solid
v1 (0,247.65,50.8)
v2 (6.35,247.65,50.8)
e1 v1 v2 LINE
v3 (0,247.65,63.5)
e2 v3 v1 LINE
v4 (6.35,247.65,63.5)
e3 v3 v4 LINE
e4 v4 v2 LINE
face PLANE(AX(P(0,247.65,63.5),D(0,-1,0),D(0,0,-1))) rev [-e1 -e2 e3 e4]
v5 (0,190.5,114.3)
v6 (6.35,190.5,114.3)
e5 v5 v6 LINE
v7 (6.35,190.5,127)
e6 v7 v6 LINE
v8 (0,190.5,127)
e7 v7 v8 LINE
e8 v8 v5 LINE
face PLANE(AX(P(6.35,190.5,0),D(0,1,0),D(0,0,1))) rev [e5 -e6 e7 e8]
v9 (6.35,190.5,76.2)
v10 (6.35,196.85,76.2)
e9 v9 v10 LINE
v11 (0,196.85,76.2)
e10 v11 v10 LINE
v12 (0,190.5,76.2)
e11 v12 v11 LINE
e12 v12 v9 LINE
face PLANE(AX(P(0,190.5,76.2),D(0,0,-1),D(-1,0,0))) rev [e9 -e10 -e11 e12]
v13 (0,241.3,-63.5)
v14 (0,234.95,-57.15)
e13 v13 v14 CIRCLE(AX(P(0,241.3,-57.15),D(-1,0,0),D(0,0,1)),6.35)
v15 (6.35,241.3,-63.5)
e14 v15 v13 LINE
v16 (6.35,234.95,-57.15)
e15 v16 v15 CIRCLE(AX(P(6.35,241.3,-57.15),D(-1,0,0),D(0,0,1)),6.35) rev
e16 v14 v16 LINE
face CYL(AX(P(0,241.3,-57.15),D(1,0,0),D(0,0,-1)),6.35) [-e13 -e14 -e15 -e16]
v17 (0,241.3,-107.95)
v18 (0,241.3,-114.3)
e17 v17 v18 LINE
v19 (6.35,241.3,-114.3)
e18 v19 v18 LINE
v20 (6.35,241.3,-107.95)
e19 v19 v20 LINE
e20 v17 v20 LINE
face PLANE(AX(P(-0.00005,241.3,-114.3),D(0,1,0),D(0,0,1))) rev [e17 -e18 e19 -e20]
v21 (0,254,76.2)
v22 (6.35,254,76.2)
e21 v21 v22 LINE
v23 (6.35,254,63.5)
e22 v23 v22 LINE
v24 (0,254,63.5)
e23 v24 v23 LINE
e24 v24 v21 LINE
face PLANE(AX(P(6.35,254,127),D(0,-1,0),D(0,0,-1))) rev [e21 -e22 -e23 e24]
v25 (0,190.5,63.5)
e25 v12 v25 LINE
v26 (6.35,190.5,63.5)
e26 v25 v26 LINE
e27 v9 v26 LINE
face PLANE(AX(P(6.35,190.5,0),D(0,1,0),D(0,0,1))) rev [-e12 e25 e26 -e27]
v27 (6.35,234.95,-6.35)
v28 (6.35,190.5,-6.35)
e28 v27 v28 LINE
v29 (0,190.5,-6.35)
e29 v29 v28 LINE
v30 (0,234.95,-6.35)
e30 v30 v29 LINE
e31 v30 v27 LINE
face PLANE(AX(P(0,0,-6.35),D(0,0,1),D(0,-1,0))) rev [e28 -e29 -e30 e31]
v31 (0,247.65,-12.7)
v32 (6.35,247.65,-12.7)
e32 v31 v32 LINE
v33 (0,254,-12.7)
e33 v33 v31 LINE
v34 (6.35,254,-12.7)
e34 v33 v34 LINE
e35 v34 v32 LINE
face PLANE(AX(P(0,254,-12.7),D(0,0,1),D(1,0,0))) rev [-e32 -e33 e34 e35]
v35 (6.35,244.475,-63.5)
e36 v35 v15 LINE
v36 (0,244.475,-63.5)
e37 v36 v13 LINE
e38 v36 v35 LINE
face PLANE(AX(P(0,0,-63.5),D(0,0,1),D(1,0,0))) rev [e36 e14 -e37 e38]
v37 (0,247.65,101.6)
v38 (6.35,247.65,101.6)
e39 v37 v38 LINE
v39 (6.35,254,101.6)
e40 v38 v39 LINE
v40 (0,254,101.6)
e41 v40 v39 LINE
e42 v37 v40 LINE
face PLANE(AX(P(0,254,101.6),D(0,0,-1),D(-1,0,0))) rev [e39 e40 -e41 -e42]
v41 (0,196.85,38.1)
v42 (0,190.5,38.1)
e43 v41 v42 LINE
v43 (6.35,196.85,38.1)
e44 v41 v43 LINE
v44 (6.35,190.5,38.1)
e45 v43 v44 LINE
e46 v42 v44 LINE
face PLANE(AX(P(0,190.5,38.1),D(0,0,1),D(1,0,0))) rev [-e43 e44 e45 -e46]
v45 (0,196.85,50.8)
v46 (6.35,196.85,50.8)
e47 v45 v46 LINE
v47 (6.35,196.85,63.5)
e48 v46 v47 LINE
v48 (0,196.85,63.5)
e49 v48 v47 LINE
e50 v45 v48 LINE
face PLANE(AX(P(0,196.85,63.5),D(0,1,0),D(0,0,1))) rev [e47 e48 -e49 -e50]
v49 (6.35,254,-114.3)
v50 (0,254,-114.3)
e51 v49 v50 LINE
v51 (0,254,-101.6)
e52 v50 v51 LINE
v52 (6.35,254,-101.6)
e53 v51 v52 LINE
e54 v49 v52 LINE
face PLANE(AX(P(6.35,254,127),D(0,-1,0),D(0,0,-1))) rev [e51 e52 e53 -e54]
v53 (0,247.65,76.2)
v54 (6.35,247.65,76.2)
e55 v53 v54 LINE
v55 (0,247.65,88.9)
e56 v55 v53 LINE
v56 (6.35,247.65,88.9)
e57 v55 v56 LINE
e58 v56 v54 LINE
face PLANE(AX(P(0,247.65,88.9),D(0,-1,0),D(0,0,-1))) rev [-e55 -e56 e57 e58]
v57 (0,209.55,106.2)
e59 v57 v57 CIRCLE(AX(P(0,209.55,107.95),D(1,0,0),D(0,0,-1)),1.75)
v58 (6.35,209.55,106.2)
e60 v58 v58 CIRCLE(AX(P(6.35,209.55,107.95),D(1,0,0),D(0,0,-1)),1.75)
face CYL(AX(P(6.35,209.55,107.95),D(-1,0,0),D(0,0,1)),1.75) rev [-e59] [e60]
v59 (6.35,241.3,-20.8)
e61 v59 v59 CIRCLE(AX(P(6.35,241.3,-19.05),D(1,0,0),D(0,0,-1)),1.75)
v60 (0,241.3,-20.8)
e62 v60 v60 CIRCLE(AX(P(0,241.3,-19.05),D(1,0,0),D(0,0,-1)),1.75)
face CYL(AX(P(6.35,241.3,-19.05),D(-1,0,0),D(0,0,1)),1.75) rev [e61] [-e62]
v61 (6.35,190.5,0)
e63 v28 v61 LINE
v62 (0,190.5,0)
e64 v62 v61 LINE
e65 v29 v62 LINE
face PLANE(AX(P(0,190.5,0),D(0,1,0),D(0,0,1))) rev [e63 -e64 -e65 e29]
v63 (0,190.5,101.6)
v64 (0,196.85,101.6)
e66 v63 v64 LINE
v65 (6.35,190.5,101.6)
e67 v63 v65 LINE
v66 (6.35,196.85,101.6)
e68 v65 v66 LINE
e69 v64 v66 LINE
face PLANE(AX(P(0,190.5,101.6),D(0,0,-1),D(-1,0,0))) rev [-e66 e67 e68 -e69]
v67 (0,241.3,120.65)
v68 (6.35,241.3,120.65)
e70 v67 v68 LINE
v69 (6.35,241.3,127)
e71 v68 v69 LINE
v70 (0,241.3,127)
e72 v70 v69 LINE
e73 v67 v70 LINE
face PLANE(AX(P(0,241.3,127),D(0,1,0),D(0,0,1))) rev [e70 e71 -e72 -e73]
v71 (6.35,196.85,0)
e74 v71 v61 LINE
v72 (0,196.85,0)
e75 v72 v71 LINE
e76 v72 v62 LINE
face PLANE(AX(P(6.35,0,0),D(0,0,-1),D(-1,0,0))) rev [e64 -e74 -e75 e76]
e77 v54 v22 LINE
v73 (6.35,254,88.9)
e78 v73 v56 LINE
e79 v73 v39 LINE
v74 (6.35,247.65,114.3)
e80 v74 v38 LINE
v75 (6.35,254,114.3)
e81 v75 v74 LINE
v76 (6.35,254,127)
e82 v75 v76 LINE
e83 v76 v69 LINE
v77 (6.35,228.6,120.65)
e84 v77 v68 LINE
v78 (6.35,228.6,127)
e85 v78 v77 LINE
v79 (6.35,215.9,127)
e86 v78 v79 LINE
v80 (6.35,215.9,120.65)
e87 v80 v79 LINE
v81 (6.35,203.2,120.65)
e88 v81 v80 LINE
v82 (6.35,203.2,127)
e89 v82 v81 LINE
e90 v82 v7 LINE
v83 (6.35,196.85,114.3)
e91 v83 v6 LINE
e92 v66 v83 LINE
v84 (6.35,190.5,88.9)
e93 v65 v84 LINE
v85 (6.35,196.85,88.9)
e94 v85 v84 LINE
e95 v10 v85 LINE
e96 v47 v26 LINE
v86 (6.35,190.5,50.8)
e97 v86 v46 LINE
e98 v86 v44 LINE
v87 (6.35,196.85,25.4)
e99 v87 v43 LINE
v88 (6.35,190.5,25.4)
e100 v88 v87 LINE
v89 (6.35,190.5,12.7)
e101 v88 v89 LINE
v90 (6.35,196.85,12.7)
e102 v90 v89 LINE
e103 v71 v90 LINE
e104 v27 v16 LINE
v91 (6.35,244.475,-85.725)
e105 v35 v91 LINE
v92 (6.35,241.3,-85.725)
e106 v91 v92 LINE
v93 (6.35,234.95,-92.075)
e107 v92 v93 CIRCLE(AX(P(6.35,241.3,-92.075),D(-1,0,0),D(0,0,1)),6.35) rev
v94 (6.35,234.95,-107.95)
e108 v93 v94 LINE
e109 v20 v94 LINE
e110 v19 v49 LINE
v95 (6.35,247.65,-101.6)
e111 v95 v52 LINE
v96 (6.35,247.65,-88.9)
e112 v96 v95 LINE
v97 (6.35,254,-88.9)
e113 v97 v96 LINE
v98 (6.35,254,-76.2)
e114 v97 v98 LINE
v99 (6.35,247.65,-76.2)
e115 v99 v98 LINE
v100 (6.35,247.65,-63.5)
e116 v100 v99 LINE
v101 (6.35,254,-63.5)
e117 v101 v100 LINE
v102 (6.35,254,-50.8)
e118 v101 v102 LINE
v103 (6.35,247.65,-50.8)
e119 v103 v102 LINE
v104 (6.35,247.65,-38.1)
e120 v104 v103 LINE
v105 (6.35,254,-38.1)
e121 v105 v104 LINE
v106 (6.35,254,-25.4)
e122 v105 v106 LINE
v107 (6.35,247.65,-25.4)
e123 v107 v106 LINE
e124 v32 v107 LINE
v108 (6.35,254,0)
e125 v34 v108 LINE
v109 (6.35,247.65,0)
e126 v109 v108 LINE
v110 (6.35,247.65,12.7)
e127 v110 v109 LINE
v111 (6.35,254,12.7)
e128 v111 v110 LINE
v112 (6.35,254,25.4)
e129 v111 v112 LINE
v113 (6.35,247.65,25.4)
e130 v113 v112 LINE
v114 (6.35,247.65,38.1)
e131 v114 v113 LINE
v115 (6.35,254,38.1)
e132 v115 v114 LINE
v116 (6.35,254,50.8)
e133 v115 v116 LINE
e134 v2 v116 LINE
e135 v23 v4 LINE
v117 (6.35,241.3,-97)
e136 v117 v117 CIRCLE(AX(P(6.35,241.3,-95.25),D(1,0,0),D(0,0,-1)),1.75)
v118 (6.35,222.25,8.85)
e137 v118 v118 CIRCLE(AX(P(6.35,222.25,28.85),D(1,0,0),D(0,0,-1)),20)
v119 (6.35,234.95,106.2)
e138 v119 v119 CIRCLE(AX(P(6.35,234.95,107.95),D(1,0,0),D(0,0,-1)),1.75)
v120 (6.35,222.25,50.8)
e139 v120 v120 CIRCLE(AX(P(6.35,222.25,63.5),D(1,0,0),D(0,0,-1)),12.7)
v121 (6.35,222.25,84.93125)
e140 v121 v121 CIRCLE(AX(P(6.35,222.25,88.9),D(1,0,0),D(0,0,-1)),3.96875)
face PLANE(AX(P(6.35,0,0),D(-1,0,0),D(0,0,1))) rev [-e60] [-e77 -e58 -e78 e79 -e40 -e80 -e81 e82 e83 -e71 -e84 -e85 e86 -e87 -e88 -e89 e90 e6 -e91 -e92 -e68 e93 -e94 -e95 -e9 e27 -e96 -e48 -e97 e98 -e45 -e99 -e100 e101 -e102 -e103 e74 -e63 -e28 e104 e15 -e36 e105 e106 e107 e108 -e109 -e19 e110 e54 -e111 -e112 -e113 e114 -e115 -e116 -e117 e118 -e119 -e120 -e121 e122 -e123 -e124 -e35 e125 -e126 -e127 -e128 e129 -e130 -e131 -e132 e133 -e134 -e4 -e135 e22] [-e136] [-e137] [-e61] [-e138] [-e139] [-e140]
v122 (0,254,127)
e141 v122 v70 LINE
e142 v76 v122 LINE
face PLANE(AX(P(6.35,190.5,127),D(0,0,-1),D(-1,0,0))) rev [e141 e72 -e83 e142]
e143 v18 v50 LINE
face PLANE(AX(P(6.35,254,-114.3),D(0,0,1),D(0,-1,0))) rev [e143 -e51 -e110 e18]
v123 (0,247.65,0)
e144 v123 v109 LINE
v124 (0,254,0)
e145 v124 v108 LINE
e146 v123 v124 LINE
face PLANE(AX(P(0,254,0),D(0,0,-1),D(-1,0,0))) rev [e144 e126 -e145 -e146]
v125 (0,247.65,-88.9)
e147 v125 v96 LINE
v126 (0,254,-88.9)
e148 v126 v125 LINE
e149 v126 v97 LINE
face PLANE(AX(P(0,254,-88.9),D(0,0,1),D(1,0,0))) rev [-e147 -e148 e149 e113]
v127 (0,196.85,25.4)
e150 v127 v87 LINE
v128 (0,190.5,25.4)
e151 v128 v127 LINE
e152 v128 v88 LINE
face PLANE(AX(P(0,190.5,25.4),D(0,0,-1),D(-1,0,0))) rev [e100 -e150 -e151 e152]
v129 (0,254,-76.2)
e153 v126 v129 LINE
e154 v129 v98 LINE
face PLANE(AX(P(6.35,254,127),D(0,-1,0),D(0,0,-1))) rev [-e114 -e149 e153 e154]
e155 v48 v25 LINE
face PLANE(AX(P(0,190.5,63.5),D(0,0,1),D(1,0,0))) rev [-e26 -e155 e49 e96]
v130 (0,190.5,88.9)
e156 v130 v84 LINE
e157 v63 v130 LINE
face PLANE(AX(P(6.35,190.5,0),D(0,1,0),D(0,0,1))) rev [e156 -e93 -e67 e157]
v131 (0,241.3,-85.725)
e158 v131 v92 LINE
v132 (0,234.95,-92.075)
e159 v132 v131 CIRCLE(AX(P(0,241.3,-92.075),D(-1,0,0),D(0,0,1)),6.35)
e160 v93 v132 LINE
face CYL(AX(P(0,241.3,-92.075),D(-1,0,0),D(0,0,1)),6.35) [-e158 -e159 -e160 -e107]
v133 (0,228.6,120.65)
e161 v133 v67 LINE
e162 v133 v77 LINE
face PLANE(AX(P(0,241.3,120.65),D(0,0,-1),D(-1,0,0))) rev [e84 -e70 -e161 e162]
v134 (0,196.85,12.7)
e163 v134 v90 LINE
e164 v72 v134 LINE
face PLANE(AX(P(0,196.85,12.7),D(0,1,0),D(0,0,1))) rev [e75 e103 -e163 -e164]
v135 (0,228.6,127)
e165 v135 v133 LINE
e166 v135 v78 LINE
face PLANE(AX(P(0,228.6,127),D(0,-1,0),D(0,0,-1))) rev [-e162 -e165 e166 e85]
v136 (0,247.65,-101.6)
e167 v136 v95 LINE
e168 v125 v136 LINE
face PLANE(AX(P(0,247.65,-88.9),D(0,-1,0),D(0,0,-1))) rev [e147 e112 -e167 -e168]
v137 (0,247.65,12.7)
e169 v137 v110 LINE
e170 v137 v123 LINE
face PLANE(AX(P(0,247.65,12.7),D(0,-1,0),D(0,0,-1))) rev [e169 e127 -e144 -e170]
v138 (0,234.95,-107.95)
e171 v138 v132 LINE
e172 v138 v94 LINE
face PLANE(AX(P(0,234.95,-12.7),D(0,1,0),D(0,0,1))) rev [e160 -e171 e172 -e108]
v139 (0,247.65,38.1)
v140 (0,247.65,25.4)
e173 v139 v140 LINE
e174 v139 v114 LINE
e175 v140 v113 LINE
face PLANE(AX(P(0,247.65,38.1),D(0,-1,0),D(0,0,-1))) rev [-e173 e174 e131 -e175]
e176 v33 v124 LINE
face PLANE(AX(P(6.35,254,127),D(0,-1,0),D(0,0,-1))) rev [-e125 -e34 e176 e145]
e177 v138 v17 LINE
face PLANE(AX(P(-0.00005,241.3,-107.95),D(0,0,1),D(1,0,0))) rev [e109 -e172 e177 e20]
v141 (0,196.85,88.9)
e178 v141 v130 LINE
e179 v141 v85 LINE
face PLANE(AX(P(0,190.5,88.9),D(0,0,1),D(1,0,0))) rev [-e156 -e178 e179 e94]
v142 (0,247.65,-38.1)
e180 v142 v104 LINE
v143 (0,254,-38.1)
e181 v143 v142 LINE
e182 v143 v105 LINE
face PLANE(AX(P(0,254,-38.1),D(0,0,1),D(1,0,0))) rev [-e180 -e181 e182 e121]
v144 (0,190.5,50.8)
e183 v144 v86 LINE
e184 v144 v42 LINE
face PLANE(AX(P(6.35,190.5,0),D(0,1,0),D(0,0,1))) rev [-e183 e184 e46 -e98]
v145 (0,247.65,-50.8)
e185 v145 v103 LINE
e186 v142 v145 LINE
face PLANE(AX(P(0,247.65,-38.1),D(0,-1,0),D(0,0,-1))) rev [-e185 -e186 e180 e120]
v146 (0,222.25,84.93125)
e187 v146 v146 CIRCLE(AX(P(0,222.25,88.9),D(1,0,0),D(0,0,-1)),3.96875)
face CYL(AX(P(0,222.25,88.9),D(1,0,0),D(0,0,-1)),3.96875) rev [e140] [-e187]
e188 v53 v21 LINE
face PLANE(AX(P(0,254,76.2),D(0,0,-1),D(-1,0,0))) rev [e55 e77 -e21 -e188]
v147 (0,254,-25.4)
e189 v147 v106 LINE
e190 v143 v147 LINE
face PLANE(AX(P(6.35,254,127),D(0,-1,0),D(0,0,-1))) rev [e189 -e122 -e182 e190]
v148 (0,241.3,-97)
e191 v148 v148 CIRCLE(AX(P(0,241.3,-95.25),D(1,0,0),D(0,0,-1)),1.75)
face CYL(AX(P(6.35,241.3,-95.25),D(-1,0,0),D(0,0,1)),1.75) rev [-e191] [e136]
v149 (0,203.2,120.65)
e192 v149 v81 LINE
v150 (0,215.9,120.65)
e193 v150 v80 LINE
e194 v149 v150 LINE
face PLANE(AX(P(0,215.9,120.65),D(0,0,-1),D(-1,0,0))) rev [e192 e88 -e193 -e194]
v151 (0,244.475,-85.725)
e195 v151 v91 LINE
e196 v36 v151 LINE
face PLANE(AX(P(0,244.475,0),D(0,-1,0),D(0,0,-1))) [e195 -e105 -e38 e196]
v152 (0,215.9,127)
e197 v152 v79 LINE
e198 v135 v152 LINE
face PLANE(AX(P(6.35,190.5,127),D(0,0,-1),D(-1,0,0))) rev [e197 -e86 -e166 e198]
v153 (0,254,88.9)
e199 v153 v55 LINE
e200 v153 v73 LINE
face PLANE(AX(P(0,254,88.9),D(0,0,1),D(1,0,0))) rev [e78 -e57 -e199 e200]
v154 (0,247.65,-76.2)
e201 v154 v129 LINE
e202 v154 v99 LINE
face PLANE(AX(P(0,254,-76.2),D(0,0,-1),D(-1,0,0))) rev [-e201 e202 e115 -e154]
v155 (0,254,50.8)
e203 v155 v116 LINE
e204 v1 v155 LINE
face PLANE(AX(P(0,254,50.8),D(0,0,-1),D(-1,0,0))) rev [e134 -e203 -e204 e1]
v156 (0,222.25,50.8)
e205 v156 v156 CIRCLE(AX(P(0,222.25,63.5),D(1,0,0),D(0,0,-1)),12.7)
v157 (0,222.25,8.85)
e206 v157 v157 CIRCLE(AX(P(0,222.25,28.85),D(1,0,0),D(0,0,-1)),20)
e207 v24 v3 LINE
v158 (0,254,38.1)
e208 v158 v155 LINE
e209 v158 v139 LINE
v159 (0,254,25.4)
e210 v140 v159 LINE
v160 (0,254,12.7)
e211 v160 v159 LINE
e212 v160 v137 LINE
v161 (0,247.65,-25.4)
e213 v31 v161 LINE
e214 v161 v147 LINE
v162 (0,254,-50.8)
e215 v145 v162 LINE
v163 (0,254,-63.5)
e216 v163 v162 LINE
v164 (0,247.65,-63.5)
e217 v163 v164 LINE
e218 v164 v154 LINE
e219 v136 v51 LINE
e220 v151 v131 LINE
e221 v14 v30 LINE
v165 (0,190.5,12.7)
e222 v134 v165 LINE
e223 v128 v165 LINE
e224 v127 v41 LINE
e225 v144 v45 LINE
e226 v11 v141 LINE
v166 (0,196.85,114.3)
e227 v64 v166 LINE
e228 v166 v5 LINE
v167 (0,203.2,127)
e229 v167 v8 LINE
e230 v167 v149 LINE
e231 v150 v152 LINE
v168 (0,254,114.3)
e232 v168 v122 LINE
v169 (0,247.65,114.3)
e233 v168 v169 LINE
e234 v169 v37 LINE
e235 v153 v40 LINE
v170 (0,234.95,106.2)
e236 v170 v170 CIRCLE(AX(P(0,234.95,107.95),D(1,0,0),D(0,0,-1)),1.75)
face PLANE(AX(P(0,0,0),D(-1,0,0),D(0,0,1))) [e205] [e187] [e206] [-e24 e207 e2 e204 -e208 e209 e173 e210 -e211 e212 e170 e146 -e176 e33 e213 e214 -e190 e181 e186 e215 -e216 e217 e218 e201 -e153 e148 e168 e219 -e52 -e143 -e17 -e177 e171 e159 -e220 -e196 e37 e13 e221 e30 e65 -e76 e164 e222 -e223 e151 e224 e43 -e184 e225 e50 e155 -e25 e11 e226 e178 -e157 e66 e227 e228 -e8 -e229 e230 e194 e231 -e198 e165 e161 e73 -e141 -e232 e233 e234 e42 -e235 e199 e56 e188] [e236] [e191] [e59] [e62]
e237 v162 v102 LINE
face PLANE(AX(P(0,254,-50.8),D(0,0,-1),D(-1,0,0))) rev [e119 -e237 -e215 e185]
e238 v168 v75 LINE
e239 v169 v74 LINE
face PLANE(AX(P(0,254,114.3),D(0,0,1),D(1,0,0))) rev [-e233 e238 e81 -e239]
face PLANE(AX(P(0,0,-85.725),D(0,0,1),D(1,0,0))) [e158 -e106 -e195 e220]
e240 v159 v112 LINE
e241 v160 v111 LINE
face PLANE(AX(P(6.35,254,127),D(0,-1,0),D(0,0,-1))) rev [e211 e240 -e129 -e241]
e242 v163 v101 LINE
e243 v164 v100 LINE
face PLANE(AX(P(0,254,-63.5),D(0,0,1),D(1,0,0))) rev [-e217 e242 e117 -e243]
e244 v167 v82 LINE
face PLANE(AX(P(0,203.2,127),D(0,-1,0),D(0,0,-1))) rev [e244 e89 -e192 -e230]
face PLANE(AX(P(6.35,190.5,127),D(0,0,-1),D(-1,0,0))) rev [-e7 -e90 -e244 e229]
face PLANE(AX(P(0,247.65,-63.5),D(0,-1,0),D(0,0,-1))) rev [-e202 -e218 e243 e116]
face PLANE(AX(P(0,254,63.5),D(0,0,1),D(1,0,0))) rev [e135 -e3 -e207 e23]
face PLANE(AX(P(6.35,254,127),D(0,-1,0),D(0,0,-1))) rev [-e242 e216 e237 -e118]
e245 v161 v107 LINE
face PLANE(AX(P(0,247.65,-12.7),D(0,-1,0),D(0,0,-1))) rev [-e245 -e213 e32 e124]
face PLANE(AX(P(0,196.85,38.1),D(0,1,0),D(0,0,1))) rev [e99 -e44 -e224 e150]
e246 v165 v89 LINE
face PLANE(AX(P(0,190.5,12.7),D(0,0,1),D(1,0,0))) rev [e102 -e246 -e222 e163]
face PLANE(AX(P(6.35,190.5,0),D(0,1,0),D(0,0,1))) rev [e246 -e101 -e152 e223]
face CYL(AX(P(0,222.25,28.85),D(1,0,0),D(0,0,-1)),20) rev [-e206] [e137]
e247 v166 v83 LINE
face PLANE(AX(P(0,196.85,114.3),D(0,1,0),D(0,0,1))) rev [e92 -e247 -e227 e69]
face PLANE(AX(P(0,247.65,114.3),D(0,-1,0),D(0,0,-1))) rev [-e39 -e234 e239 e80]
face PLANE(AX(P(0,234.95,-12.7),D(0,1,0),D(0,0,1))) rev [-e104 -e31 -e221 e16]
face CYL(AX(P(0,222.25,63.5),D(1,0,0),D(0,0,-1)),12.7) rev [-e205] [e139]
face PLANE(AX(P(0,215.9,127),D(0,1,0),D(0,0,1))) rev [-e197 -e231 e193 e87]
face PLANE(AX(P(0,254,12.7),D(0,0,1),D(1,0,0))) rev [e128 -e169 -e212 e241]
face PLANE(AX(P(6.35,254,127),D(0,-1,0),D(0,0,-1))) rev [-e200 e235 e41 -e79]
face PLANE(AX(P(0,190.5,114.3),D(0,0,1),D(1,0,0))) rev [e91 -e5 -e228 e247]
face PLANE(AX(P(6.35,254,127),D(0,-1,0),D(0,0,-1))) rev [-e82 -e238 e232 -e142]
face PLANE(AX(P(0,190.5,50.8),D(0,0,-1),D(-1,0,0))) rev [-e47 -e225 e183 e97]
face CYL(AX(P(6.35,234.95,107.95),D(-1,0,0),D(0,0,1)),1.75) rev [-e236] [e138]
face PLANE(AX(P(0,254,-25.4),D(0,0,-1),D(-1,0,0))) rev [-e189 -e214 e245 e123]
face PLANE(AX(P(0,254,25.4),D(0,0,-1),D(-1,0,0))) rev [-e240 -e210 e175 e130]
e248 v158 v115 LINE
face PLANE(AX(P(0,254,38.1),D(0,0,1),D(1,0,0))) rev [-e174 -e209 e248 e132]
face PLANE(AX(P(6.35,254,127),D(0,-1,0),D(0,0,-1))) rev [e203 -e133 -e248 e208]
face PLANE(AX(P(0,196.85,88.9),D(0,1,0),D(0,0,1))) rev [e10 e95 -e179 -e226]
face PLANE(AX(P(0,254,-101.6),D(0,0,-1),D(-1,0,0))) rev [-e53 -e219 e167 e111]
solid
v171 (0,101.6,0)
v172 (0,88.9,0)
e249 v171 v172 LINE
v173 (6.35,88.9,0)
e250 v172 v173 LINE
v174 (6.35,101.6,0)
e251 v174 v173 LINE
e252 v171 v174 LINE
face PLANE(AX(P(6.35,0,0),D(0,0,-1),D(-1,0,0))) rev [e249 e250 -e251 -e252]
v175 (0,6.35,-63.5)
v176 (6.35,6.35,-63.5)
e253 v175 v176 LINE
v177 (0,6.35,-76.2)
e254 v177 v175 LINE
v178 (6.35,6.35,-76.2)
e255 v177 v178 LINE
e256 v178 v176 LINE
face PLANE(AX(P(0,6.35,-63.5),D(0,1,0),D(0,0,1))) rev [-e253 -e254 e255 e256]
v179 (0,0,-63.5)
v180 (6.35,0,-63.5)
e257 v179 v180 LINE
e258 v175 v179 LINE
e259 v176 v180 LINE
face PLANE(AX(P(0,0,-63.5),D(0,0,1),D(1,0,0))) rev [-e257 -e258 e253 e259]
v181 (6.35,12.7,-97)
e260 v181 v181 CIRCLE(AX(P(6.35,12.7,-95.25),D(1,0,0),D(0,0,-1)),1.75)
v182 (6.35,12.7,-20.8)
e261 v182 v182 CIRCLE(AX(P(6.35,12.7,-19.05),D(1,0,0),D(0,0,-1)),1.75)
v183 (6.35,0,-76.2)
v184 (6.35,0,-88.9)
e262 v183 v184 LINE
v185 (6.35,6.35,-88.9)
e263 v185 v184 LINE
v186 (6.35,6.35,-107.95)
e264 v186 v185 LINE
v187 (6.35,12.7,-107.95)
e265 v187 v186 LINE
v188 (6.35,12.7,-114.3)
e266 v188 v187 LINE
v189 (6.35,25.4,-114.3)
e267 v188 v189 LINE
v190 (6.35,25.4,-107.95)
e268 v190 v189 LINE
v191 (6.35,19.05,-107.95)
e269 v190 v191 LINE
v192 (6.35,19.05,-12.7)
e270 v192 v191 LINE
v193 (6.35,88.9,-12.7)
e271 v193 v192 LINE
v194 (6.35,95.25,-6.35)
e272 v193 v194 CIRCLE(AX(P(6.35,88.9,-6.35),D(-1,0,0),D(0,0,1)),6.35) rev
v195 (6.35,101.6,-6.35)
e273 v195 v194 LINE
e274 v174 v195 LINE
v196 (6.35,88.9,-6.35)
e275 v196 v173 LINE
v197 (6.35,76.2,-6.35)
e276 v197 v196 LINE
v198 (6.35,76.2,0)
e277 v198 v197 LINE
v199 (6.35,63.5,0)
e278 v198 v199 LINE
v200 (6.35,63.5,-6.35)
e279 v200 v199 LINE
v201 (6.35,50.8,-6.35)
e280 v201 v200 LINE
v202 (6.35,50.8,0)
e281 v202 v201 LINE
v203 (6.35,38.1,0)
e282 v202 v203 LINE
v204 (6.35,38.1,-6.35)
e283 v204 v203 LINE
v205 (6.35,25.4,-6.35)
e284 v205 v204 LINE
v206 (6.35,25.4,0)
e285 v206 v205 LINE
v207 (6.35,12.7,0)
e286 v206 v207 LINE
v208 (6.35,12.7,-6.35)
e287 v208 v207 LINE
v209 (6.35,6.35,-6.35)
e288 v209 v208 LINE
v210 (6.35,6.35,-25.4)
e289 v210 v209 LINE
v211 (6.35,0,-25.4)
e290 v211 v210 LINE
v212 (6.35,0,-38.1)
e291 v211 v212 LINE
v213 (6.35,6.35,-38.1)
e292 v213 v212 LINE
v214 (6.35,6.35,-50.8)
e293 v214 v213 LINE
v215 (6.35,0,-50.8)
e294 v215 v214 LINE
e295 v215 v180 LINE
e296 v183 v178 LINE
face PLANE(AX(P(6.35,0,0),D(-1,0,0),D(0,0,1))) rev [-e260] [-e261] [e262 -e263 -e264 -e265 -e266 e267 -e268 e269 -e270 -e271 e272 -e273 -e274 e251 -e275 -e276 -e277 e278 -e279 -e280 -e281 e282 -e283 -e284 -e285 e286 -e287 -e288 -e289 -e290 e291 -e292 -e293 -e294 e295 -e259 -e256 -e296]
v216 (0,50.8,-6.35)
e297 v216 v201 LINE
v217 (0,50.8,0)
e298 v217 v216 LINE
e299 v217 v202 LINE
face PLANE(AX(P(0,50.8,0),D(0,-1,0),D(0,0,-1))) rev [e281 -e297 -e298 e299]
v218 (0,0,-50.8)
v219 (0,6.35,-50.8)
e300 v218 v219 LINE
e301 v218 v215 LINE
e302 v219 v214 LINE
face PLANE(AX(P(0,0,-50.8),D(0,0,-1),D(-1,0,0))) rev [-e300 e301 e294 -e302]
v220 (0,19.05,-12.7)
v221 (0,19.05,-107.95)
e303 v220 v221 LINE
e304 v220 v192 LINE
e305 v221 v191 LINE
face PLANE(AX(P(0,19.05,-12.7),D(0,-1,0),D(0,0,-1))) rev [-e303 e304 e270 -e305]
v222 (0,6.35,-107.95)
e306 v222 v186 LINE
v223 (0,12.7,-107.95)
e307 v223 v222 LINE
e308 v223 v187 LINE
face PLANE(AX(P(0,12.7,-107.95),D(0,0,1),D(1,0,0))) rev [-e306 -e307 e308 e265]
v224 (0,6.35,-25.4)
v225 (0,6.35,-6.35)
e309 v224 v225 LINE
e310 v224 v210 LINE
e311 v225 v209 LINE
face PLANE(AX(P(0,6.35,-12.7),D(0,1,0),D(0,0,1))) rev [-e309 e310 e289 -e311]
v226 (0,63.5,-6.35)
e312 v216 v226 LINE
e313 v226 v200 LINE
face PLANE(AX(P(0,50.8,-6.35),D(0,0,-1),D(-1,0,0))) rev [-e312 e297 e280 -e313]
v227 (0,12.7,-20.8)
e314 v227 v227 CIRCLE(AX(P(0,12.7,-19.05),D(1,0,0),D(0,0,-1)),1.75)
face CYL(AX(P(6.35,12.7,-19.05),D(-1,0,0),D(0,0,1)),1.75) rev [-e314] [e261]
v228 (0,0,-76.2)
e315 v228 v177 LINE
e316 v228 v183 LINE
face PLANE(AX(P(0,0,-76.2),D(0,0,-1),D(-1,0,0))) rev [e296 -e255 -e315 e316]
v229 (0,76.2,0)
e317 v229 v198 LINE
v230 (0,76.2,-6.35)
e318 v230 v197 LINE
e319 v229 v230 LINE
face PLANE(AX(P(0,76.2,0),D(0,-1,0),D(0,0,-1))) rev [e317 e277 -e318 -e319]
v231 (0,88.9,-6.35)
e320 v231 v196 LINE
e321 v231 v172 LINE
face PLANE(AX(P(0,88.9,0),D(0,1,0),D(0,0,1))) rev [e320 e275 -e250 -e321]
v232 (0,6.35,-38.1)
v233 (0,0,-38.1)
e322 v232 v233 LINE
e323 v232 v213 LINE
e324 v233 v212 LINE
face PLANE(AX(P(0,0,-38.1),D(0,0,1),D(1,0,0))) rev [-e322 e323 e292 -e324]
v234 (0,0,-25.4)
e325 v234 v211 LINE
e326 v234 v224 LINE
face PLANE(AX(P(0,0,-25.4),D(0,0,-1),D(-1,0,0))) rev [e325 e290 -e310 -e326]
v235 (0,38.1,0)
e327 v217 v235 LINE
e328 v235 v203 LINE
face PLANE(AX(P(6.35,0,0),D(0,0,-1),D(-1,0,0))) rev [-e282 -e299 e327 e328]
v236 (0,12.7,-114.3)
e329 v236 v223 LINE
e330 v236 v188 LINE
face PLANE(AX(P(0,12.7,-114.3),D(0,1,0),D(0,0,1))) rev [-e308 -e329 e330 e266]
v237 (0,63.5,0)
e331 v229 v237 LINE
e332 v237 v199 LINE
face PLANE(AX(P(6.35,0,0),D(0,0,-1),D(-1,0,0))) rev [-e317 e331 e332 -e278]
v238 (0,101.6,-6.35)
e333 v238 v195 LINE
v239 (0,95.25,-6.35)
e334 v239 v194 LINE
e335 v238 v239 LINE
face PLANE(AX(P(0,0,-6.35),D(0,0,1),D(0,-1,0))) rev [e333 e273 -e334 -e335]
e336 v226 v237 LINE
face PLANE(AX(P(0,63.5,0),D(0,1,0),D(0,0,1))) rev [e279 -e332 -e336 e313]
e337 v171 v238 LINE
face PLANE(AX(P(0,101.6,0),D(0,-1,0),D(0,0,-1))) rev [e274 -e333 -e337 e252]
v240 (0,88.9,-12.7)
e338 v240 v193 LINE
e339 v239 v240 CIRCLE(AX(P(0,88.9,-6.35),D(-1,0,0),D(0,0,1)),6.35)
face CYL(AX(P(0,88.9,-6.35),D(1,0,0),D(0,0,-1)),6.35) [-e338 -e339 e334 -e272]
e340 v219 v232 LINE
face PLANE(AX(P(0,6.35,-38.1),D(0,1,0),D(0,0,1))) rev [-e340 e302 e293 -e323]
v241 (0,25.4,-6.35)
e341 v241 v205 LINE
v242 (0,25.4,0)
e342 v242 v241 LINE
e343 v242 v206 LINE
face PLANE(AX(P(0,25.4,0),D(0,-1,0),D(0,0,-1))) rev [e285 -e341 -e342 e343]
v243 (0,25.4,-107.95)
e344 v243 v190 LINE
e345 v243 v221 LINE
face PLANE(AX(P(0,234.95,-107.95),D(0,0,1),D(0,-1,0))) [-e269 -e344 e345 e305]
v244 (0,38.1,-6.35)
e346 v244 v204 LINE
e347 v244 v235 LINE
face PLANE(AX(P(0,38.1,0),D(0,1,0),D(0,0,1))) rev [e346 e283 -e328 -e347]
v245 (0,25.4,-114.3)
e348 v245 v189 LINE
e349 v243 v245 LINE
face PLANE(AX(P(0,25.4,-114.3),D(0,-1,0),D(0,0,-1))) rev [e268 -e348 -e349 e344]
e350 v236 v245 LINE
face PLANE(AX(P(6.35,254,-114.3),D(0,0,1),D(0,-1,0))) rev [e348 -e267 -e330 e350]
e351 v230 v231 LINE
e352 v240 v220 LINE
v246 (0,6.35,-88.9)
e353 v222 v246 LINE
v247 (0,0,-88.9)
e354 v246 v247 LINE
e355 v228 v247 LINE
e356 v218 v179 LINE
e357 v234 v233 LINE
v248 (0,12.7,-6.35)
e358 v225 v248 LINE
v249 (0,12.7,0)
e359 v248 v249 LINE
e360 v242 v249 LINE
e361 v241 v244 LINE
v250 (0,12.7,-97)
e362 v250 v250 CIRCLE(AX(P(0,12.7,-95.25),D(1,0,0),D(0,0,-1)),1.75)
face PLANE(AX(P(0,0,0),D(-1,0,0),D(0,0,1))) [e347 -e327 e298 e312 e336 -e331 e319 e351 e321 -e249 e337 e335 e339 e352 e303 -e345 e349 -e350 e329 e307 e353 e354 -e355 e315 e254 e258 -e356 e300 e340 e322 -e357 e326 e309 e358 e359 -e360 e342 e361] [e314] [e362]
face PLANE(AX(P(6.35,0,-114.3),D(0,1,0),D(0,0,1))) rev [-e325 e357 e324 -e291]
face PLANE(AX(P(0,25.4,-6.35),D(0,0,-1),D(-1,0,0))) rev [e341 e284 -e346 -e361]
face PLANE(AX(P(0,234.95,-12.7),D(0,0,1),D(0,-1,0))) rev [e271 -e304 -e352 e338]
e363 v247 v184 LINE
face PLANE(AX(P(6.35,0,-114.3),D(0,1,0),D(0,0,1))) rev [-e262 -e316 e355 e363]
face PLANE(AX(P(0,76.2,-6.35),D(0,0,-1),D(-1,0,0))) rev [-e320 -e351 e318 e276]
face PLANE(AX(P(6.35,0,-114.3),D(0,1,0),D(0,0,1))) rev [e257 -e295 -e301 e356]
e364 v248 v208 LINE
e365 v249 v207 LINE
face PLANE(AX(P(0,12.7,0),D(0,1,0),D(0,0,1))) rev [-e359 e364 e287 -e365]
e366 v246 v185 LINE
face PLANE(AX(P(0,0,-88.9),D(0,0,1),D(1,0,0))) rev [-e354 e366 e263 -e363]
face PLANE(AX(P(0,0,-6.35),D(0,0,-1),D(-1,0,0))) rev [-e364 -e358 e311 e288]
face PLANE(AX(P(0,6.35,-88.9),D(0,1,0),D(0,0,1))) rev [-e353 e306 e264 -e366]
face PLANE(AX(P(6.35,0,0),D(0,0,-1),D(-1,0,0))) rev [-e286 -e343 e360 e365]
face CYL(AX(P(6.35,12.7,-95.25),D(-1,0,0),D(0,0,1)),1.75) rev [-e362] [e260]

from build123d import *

# Parameters (mm, degrees)
SKETCH1_R           = 1.75
BOSS_EXTRUDE1_DEPTH = 6.35
SKETCH2_W           = 12.7
SKETCH2_H           = 6.35
CUT_EXTRUDE1_DEPTH  = 285.051619429
LPATTERN1_COUNT     = 10
LPATTERN1_PITCH     = 25.4
SKETCH3_W           = 6.35
SKETCH3_H           = 12.7
CUT_EXTRUDE2_DEPTH  = 285.051619429
LPATTERN2_COUNT     = 10
LPATTERN2_PITCH     = 25.4
SKETCH4_W           = 6.35
SKETCH4_H           = 12.7
CUT_EXTRUDE3_DEPTH  = 285.051619429
SKETCH5_W           = 12.7
SKETCH5_H           = 6.35
CUT_EXTRUDE4_DEPTH  = 285.051619429
LPATTERN3_COUNT     = 5
LPATTERN3_PITCH     = 25.4
SKETCH6_W           = 6.35
SKETCH6_H           = 12.7
CUT_EXTRUDE5_DEPTH  = 285.051619429
LPATTERN4_COUNT     = 8
LPATTERN4_PITCH     = 25.4
SKETCH7_W           = 12.7
SKETCH7_H           = 6.35
CUT_EXTRUDE6_DEPTH  = 285.051619429
SKETCH8_W           = 6.35
SKETCH8_H           = 6.35
CUT_EXTRUDE7_DEPTH  = 285.051619429
SKETCH9_W           = 88.9
SKETCH9_H           = 215.9
CUT_EXTRUDE8_DEPTH  = 285.051619429
SKETCH10_R          = 3.96875
CUT_EXTRUDE9_DEPTH  = 285.051619429
SKETCH12_R          = 12.7
CUT_EXTRUDE11_DEPTH = 285.051619429
SKETCH13_R          = 20
CUT_EXTRUDE12_DEPTH = 285.051619429
SKETCH14_W          = 6.35
SKETCH14_H          = 139.7
SKETCH14_W_2        = 22.225
SKETCH14_H_2        = 9.525
SKETCH14_H_3        = 215.9
CUT_EXTRUDE14_DEPTH = 285.051619429
SKETCH15_W          = 6.35
SKETCH15_H          = 101.6
CUT_EXTRUDE15_DEPTH = 285.051619429
FILLET1_R           = 6.35
SKETCH16_W          = 29.62248357
SKETCH16_H          = 194.777974162
SKETCH16_W_2        = 38.14401994
SKETCH16_H_2        = 73.853315203
CUT_EXTRUDE16_DEPTH = 285.051619429
FILLET2_R           = 6.35


with BuildPart() as part:
    # Sketch1 → Boss-Extrude1 (new body)
    with BuildSketch(Plane(origin=(0, 0, 0), x_dir=(0, 0, -1), z_dir=(1, 0, 0))):
        Polygon((0, 0), (0, 190.5), (-127, 190.5), (-127, 254), (114.3, 254), (114.3, 0), align=None)
        with Locations((-107.95, 234.95)):
            Circle(SKETCH1_R, mode=Mode.SUBTRACT)
        with Locations((-107.95, 209.55)):
            Circle(SKETCH1_R, mode=Mode.SUBTRACT)
        with Locations((19.05, 241.3)):
            Circle(SKETCH1_R, mode=Mode.SUBTRACT)
        with Locations((95.25, 241.3)):
            Circle(SKETCH1_R, mode=Mode.SUBTRACT)
        with Locations((19.05, 12.7)):
            Circle(SKETCH1_R, mode=Mode.SUBTRACT)
        with Locations((95.25, 12.7)):
            Circle(SKETCH1_R, mode=Mode.SUBTRACT)
    extrude(amount=BOSS_EXTRUDE1_DEPTH)

    # Sketch2 → Cut-Extrude1 (cut, through all)
    with BuildSketch(Plane(origin=(6.35, 0, 0), x_dir=(0, 0, -1), z_dir=(1, 0, 0))):
        with Locations((-107.95, 250.825)):
            Rectangle(SKETCH2_W, SKETCH2_H)
    cut_extrude1 = extrude(amount=-CUT_EXTRUDE1_DEPTH, mode=Mode.SUBTRACT)

    # LPattern1: Cut-Extrude1 ×10
    with Locations(*[(0, 0, -i * LPATTERN1_PITCH) for i in range(1, LPATTERN1_COUNT)]):
        add(cut_extrude1, mode=Mode.SUBTRACT)

    # Sketch3 → Cut-Extrude2 (cut, through all)
    with BuildSketch(Plane(origin=(6.35, 0, 0), x_dir=(0, 0, -1), z_dir=(1, 0, 0))):
        with Locations((111.125, 234.95)):
            Rectangle(SKETCH3_W, SKETCH3_H)
    cut_extrude2 = extrude(amount=-CUT_EXTRUDE2_DEPTH, mode=Mode.SUBTRACT)

    # LPattern2: Cut-Extrude2 ×10
    with Locations(*[(0, -i * LPATTERN2_PITCH, 0) for i in range(1, LPATTERN2_COUNT)]):
        add(cut_extrude2, mode=Mode.SUBTRACT)

    # Sketch4 → Cut-Extrude3 (cut, through all)
    with BuildSketch(Plane(origin=(6.35, 0, 0), x_dir=(0, 0, -1), z_dir=(1, 0, 0))):
        with Locations((-123.825, 234.95)):
            Rectangle(SKETCH4_W, SKETCH4_H)
        with Locations((-123.825, 209.55)):
            Rectangle(SKETCH4_W, SKETCH4_H)
    extrude(amount=-CUT_EXTRUDE3_DEPTH, mode=Mode.SUBTRACT)

    # Sketch5 → Cut-Extrude4 (cut, through all)
    with BuildSketch(Plane(origin=(6.35, 0, 0), x_dir=(0, 0, -1), z_dir=(1, 0, 0))):
        with Locations((-107.95, 193.675)):
            Rectangle(SKETCH5_W, SKETCH5_H)
    cut_extrude4 = extrude(amount=-CUT_EXTRUDE4_DEPTH, mode=Mode.SUBTRACT)

    # LPattern3: Cut-Extrude4 ×5
    with Locations(*[(0, 0, -i * LPATTERN3_PITCH) for i in range(1, LPATTERN3_COUNT)]):
        add(cut_extrude4, mode=Mode.SUBTRACT)

    # Sketch6 → Cut-Extrude5 (cut, through all)
    with BuildSketch(Plane(origin=(6.35, 0, 0), x_dir=(0, 0, -1), z_dir=(1, 0, 0))):
        with Locations((3.175, 6.35)):
            Rectangle(SKETCH6_W, SKETCH6_H)
    cut_extrude5 = extrude(amount=-CUT_EXTRUDE5_DEPTH, mode=Mode.SUBTRACT)

    # LPattern4: Cut-Extrude5 ×8
    with Locations(*[(0, i * LPATTERN4_PITCH, 0) for i in range(1, LPATTERN4_COUNT)]):
        add(cut_extrude5, mode=Mode.SUBTRACT)

    # Sketch7 → Cut-Extrude6 (cut, through all)
    with BuildSketch(Plane(origin=(6.35, 0, 0), x_dir=(0, 0, -1), z_dir=(1, 0, 0))):
        with Locations((19.05, 3.175)):
            Rectangle(SKETCH7_W, SKETCH7_H)
        with Locations((44.45, 3.175)):
            Rectangle(SKETCH7_W, SKETCH7_H)
        with Locations((69.85, 3.175)):
            Rectangle(SKETCH7_W, SKETCH7_H)
        with Locations((95.25, 3.175)):
            Rectangle(SKETCH7_W, SKETCH7_H)
    extrude(amount=-CUT_EXTRUDE6_DEPTH, mode=Mode.SUBTRACT)

    # Sketch8 → Cut-Extrude7 (cut, through all)
    with BuildSketch(Plane(origin=(6.35, 0, 0), x_dir=(0, 0, -1), z_dir=(1, 0, 0))):
        with Locations((9.525, 3.175)):
            Rectangle(SKETCH8_W, SKETCH8_H)
        with Locations((104.775, 3.175)):
            Rectangle(SKETCH8_W, SKETCH8_H)
    extrude(amount=-CUT_EXTRUDE7_DEPTH, mode=Mode.SUBTRACT)

    # Sketch9 → Cut-Extrude8 (cut, through all)
    with BuildSketch(Plane(origin=(6.35, 0, 0), x_dir=(0, 0, -1), z_dir=(1, 0, 0))):
        with Locations((57.15, 127)):
            Rectangle(SKETCH9_W, SKETCH9_H)
    extrude(amount=-CUT_EXTRUDE8_DEPTH, mode=Mode.SUBTRACT)

    # Sketch10 → Cut-Extrude9 (cut, through all)
    with BuildSketch(Plane(origin=(6.35, 0, 0), x_dir=(0, 0, -1), z_dir=(1, 0, 0))):
        with Locations((-88.9, 222.25)):
            Circle(SKETCH10_R)
    extrude(amount=-CUT_EXTRUDE9_DEPTH, mode=Mode.SUBTRACT)

    # Sketch12 → Cut-Extrude11 (cut, through all)
    with BuildSketch(Plane(origin=(6.35, 0, 0), x_dir=(0, 0, -1), z_dir=(1, 0, 0))):
        with Locations((-63.5, 222.25)):
            Circle(SKETCH12_R)
    extrude(amount=-CUT_EXTRUDE11_DEPTH, mode=Mode.SUBTRACT)

    # Sketch13 → Cut-Extrude12 (cut, through all)
    with BuildSketch(Plane(origin=(6.35, 0, 0), x_dir=(0, 0, -1), z_dir=(1, 0, 0))):
        with Locations((-28.849999958, 222.25)):
            Circle(SKETCH13_R)
    extrude(amount=-CUT_EXTRUDE12_DEPTH, mode=Mode.SUBTRACT)

    # Sketch14 → Cut-Extrude14 (cut, through all)
    with BuildSketch(Plane(origin=(6.35, 0, 0), x_dir=(0, 0, -1), z_dir=(1, 0, 0))):
        with Locations((9.525, 165.1)):
            Rectangle(SKETCH14_W, SKETCH14_H)
        with Locations((74.6125, 239.7125)):
            Rectangle(SKETCH14_W_2, SKETCH14_H_2)
        with Locations((104.775, 127)):
            Rectangle(SKETCH14_W, SKETCH14_H_3)
    extrude(amount=-CUT_EXTRUDE14_DEPTH, mode=Mode.SUBTRACT)


with BuildPart() as cut_extrude14_piece_1:
    # of the separate pieces the step leaves, piece 1, a body of its own (cut_extrude14_pieces)
    add(part.part.solids().sort_by_distance((0, 234.95, -107.95))[0])

    # Fillet1
    fillet1_edges = [cut_extrude14_piece_1.edges().sort_by_distance(p)[0] for p in [
        (3.175, 234.95, -63.5),
        (3.175, 234.95, -85.725),
    ]]
    fillet(fillet1_edges, radius=FILLET1_R)


with BuildPart() as cut_extrude14_piece_2:
    # of the separate pieces the step leaves, piece 2, a body of its own (cut_extrude14_pieces)
    add(part.part.solids().sort_by_distance((6.35, 63.5, 0))[0])

    # Fillet2
    fillet2_edges = [cut_extrude14_piece_2.edges().sort_by_distance(p)[0] for p in [
        (3.175, 95.25, -12.7),
    ]]
    fillet(fillet2_edges, radius=FILLET2_R - 0.0001)  # a hair under: the kernel refuses the full size


with BuildPart() as cut_extrude14_piece_3:
    # of the separate pieces the step leaves, piece 3, a body of its own (cut_extrude14_pieces)
    add(part.part.solids().sort_by_distance((0, 38.1, -107.95))[0])


with BuildPart() as cut_extrude14_piece_4:
    # of the separate pieces the step leaves, piece 4, a body of its own (cut_extrude14_pieces)
    add(part.part.solids().sort_by_distance((0, 139.7, -107.95))[0])


with BuildPart() as cut_extrude14_piece_5:
    # of the separate pieces the step leaves, piece 5, a body of its own (cut_extrude14_pieces)
    add(part.part.solids().sort_by_distance((0, 114.3, -107.95))[0])


with BuildPart() as cut_extrude14_piece_6:
    # of the separate pieces the step leaves, piece 6, a body of its own (cut_extrude14_pieces)
    add(part.part.solids().sort_by_distance((0, 190.5, -107.95))[0])


with BuildPart() as cut_extrude14_piece_7:
    # of the separate pieces the step leaves, piece 7, a body of its own (cut_extrude14_pieces)
    add(part.part.solids().sort_by_distance((0, 215.9, -107.95))[0])


with BuildPart() as cut_extrude14_piece_8:
    # of the separate pieces the step leaves, piece 8, a body of its own (cut_extrude14_pieces)
    add(part.part.solids().sort_by_distance((0, 63.5, -107.95))[0])


with BuildPart() as cut_extrude14_piece_9:
    # of the separate pieces the step leaves, piece 9, a body of its own (cut_extrude14_pieces)
    add(part.part.solids().sort_by_distance((0, 165.1, -107.95))[0])


with BuildPart() as cut_extrude14_piece_10:
    # of the separate pieces the step leaves, piece 10, a body of its own (cut_extrude14_pieces)
    add(part.part.solids().sort_by_distance((0, 88.9, -107.95))[0])


with BuildPart() as cut_extrude14_piece_11:
    # of the separate pieces the step leaves, piece 11, a body of its own (cut_extrude14_pieces)
    add(part.part.solids().sort_by_distance((0, 177.8, -6.35))[0])


with BuildPart() as cut_extrude14_piece_12:
    # of the separate pieces the step leaves, piece 12, a body of its own (cut_extrude14_pieces)
    add(part.part.solids().sort_by_distance((0, 127, -6.35))[0])


with BuildPart() as cut_extrude14_piece_13:
    # of the separate pieces the step leaves, piece 13, a body of its own (cut_extrude14_pieces)
    add(part.part.solids().sort_by_distance((0, 152.4, -6.35))[0])


with BuildPart() as cut_extrude15_tool:
    # Sketch15 → Cut-Extrude15 (new, through all)
    with BuildSketch(Plane(origin=(6.35, 0, 0), x_dir=(0, 0, -1), z_dir=(1, 0, 0))):
        with Locations((111.125, 114.3)):
            Rectangle(SKETCH15_W, SKETCH15_H)
    extrude(amount=-CUT_EXTRUDE15_DEPTH)


with BuildPart() as cut_extrude14_piece_4_1:
    add(cut_extrude14_piece_4.part)

    # Cut-Extrude15: cut by cut_extrude15_tool
    add(cut_extrude15_tool.part, mode=Mode.SUBTRACT)


with BuildPart() as cut_extrude14_piece_5_1:
    add(cut_extrude14_piece_5.part)

    # Cut-Extrude15: cut by cut_extrude15_tool
    add(cut_extrude15_tool.part, mode=Mode.SUBTRACT)


with BuildPart() as cut_extrude14_piece_8_1:
    add(cut_extrude14_piece_8.part)

    # Cut-Extrude15: cut by cut_extrude15_tool
    add(cut_extrude15_tool.part, mode=Mode.SUBTRACT)


with BuildPart() as cut_extrude14_piece_10_1:
    add(cut_extrude14_piece_10.part)

    # Cut-Extrude15: cut by cut_extrude15_tool
    add(cut_extrude15_tool.part, mode=Mode.SUBTRACT)


with BuildPart() as cut_extrude16_tool:
    # Sketch16 → Cut-Extrude16 (new, through all)
    with BuildSketch(Plane(origin=(6.35, 0, 0), x_dir=(0, 0, -1), z_dir=(1, 0, 0))):
        with Locations((111.610650232, 133.672166478)):
            Rectangle(SKETCH16_W, SKETCH16_H)
        with Locations((5.091445612, 147.063152203)):
            Rectangle(SKETCH16_W_2, SKETCH16_H_2)
    extrude(amount=-CUT_EXTRUDE16_DEPTH)


with BuildPart() as cut_extrude14_piece_3_1:
    add(cut_extrude14_piece_3.part)

    # Cut-Extrude16: cut by cut_extrude16_tool
    add(cut_extrude16_tool.part, mode=Mode.SUBTRACT)


with BuildPart() as cut_extrude14_piece_6_1:
    add(cut_extrude14_piece_6.part)

    # Cut-Extrude16: cut by cut_extrude16_tool
    add(cut_extrude16_tool.part, mode=Mode.SUBTRACT)


with BuildPart() as cut_extrude14_piece_7_1:
    add(cut_extrude14_piece_7.part)

    # Cut-Extrude16: cut by cut_extrude16_tool
    add(cut_extrude16_tool.part, mode=Mode.SUBTRACT)


with BuildPart() as cut_extrude14_piece_9_1:
    add(cut_extrude14_piece_9.part)

    # Cut-Extrude16: cut by cut_extrude16_tool
    add(cut_extrude16_tool.part, mode=Mode.SUBTRACT)


with BuildPart() as cut_extrude14_piece_11_1:
    add(cut_extrude14_piece_11.part)

    # Cut-Extrude16: cut by cut_extrude16_tool
    add(cut_extrude16_tool.part, mode=Mode.SUBTRACT)


with BuildPart() as cut_extrude14_piece_12_1:
    add(cut_extrude14_piece_12.part)

    # Cut-Extrude16: cut by cut_extrude16_tool
    add(cut_extrude16_tool.part, mode=Mode.SUBTRACT)


with BuildPart() as cut_extrude14_piece_13_1:
    add(cut_extrude14_piece_13.part)

    # Cut-Extrude16: cut by cut_extrude16_tool
    add(cut_extrude16_tool.part, mode=Mode.SUBTRACT)


solid = Compound([cut_extrude14_piece_1.part, cut_extrude14_piece_2.part])
